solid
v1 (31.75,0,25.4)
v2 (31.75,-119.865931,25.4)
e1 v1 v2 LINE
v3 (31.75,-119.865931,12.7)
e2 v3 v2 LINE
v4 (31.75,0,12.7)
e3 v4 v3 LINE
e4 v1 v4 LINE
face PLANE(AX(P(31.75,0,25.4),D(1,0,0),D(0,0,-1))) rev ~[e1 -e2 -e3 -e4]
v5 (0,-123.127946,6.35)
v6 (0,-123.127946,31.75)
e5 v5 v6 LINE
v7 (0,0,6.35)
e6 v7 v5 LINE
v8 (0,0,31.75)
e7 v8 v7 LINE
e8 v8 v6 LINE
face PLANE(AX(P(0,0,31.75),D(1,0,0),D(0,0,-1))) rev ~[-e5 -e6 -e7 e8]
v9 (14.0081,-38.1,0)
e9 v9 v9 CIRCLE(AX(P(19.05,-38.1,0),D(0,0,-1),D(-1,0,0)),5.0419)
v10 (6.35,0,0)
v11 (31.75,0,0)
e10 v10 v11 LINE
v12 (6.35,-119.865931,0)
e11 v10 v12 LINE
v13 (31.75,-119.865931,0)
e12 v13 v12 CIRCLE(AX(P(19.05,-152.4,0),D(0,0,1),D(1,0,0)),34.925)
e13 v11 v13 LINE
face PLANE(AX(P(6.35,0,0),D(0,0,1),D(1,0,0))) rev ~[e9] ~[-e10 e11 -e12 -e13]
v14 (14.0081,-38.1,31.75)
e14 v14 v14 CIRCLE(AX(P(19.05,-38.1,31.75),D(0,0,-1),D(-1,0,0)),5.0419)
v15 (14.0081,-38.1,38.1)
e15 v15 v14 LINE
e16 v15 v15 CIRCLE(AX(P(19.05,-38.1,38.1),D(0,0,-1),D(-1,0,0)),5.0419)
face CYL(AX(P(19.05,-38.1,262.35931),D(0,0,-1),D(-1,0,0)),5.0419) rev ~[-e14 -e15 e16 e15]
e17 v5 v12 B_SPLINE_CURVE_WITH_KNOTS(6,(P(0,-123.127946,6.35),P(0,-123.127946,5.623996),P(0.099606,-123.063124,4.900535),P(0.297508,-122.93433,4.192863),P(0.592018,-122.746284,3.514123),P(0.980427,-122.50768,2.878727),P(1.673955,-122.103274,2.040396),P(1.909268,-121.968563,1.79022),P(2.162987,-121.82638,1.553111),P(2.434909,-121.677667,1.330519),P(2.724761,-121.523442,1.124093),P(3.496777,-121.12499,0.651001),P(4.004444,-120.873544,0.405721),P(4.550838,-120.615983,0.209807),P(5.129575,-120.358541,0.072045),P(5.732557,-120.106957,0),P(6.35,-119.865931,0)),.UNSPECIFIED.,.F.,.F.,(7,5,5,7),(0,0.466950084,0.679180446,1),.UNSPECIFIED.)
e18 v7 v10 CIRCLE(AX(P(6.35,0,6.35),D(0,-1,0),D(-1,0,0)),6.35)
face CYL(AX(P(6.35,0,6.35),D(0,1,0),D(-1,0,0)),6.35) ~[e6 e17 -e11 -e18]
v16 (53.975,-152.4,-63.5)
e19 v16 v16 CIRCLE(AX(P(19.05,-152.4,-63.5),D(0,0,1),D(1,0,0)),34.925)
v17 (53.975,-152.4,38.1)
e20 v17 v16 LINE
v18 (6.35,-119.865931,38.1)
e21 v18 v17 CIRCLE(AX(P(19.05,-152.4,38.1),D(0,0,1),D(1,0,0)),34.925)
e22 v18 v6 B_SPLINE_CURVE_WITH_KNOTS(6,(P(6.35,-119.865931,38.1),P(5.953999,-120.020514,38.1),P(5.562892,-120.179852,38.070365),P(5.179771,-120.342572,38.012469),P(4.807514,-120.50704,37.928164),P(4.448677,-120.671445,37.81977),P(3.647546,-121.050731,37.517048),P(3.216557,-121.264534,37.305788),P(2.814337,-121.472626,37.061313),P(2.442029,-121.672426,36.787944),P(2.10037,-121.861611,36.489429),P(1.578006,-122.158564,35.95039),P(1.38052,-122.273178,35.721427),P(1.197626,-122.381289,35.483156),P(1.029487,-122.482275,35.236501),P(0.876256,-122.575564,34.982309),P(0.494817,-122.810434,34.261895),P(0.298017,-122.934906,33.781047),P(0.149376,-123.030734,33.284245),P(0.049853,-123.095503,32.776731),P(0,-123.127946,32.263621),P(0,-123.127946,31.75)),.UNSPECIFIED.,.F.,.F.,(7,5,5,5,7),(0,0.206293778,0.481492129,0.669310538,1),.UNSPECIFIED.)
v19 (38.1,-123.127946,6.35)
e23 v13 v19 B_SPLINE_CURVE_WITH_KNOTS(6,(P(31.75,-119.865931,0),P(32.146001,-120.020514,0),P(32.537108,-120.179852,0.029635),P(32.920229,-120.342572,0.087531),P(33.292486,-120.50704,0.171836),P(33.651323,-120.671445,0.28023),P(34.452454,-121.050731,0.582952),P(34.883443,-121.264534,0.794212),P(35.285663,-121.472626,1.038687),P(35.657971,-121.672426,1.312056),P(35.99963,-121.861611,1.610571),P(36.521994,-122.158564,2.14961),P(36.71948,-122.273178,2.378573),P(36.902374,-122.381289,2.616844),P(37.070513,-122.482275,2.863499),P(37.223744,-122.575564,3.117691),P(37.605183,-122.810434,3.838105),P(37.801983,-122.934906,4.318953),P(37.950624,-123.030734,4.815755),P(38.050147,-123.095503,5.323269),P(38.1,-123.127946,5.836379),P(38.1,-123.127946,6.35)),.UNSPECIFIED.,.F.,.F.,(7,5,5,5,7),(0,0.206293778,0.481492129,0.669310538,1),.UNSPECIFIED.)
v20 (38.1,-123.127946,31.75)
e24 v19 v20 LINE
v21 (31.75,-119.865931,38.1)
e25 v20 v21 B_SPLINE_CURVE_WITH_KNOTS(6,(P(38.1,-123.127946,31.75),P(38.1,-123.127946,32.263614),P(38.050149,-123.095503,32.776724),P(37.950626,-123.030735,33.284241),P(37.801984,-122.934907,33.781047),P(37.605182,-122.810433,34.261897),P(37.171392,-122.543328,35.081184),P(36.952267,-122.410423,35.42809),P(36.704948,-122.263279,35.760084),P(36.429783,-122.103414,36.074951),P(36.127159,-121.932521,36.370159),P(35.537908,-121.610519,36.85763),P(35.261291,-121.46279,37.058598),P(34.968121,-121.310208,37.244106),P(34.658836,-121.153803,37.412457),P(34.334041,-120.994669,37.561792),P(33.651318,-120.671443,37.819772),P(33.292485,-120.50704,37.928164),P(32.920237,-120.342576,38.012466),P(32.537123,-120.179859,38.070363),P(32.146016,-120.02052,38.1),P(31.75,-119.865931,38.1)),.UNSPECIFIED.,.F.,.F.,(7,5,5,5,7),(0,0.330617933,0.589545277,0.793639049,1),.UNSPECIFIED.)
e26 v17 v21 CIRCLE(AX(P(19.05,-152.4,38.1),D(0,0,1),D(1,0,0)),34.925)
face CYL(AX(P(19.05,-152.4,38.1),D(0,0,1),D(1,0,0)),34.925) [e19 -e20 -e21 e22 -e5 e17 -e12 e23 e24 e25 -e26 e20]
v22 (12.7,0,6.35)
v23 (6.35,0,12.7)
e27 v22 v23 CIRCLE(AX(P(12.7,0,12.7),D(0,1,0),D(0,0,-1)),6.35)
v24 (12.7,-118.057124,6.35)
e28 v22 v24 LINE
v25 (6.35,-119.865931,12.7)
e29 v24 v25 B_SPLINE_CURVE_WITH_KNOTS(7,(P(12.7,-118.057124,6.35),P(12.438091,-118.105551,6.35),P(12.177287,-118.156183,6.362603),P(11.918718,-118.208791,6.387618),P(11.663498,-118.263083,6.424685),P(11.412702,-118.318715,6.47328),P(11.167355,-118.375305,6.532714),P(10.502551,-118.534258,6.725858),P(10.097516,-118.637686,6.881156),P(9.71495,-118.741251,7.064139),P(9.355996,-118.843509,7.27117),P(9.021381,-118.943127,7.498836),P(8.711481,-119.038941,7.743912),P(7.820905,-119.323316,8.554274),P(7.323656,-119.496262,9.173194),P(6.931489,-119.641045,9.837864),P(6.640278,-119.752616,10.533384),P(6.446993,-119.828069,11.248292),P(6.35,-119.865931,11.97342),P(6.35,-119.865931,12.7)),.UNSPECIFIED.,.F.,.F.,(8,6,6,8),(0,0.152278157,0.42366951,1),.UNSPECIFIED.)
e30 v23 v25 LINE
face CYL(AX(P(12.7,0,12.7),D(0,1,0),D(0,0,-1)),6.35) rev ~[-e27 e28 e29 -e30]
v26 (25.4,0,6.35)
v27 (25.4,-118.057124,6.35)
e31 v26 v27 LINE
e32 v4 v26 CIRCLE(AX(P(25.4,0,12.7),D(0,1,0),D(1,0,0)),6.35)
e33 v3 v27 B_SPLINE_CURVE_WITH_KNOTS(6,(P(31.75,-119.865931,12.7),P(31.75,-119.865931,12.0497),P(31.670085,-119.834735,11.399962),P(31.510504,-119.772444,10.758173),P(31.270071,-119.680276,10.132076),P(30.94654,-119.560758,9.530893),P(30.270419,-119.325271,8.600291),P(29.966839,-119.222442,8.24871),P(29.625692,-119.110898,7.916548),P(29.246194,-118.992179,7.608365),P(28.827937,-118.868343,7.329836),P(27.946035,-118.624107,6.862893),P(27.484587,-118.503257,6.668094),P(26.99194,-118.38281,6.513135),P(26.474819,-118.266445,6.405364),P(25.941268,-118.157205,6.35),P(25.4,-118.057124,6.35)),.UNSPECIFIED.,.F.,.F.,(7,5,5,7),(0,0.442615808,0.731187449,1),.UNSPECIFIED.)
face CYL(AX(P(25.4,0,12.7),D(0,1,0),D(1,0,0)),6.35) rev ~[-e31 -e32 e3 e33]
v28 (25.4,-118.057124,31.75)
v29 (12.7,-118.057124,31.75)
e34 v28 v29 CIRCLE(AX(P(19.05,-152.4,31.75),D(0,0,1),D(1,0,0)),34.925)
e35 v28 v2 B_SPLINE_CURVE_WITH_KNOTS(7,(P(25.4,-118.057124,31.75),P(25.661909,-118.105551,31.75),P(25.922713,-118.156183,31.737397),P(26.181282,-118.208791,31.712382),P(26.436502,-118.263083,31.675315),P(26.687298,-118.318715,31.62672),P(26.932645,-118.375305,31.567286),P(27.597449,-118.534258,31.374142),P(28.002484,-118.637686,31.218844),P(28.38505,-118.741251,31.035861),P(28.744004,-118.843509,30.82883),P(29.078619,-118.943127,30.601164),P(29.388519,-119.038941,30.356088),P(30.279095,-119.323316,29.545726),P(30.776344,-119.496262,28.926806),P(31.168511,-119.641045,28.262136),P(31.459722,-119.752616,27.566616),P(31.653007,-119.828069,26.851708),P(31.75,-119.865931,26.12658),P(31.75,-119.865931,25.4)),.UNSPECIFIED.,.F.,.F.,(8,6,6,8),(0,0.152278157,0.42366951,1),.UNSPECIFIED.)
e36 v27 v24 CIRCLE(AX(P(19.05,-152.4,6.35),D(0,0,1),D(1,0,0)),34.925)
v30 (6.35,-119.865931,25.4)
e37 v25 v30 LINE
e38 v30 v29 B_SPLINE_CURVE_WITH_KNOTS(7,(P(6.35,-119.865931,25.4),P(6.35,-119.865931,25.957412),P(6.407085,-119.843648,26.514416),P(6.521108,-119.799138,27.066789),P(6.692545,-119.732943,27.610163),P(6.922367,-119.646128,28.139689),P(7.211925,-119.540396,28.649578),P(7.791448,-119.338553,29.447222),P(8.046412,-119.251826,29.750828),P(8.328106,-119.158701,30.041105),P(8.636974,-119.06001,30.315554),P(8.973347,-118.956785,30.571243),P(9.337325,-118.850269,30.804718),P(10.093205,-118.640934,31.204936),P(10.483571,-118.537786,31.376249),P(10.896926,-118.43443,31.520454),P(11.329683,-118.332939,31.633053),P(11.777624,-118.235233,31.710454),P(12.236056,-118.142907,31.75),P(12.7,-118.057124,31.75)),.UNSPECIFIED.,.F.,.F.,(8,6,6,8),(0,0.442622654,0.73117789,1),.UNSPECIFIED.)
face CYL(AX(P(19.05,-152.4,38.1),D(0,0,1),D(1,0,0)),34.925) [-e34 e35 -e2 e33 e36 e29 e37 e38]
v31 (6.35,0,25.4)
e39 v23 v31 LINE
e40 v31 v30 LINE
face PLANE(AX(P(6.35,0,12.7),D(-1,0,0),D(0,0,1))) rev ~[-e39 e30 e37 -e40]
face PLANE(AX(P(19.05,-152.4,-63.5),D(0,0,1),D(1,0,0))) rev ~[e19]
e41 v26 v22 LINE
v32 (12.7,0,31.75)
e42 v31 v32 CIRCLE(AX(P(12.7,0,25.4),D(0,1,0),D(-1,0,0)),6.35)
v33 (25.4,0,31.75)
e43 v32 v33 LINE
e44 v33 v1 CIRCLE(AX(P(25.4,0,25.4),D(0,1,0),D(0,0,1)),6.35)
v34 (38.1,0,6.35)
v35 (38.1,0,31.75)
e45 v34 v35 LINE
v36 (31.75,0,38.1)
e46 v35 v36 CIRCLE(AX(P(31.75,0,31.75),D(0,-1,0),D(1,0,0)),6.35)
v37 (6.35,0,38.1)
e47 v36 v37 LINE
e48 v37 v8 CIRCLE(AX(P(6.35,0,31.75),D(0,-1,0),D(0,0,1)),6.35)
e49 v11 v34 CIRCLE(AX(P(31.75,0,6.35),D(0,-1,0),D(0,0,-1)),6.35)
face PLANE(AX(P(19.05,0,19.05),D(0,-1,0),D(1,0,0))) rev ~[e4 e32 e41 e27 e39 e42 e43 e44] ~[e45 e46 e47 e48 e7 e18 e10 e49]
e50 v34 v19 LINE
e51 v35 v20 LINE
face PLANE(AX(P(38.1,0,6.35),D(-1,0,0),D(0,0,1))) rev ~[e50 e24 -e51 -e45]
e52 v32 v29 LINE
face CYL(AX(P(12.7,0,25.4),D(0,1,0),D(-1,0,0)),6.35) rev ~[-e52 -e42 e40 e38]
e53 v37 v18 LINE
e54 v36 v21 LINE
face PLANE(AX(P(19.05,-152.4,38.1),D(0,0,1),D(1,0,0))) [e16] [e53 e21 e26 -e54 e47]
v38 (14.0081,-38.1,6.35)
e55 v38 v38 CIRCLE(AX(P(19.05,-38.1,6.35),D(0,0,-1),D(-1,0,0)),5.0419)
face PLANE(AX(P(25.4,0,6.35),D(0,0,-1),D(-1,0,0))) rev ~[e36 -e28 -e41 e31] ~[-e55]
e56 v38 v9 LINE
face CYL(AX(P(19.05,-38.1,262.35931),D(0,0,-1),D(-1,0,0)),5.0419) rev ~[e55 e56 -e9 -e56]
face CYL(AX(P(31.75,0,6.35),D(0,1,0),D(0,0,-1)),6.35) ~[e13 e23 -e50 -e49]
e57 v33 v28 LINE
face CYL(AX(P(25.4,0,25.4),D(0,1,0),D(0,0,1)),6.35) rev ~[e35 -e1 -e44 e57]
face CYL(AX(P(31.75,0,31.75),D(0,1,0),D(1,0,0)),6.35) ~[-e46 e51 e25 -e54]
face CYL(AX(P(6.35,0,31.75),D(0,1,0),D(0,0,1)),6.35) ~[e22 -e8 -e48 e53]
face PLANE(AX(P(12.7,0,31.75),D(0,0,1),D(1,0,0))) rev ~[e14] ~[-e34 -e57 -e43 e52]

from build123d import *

# Parameters (mm, degrees)
F1_DEPTH = 152.4
F2_R     = 34.925
F3_DEPTH = 101.6
F5_D     = 10.0838


with BuildPart() as f1:
    # F0 (on Front) → F1 (new body)
    with BuildSketch(Plane.XZ):
        with BuildLine():
            ThreePointArc((0, 6.35), (1.8598719395, 1.8598719395), (6.35, 0))
            Line((6.35, 0), (31.75, 0))
            ThreePointArc((31.75, 0), (36.2401280605, 1.8598719395), (38.1, 6.35))
            Line((38.1, 6.35), (38.1, 31.75))
            ThreePointArc((38.1, 31.75), (36.2401280605, 36.2401280605), (31.75, 38.1))
            Line((31.75, 38.1), (6.35, 38.1))
            ThreePointArc((6.35, 38.1), (1.8598719395, 36.2401280605), (0, 31.75))
            Line((0, 31.75), (0, 6.35))
        make_face()
        with BuildLine():
            Line((25.4, 6.35), (12.7, 6.35))
            ThreePointArc((12.7, 6.35), (8.2098719395, 8.2098719395), (6.35, 12.7))
            Line((6.35, 12.7), (6.35, 25.4))
            ThreePointArc((6.35, 25.4), (8.2098719395, 29.8901280605), (12.7, 31.75))
            Line((12.7, 31.75), (25.4, 31.75))
            ThreePointArc((25.4, 31.75), (29.8901280605, 29.8901280605), (31.75, 25.4))
            Line((31.75, 25.4), (31.75, 12.7))
            ThreePointArc((31.75, 12.7), (29.8901280605, 8.2098719395), (25.4, 6.35))
        make_face(mode=Mode.SUBTRACT)
    extrude(amount=F1_DEPTH)

    # F2 (on face) → F3 (join)
    with BuildSketch(Plane.XY.offset(38.1)):
        with Locations((19.05, -152.4)):
            Circle(F2_R)
    extrude(amount=-F3_DEPTH)

    # F5 (through all)
    with Locations(Plane.XY.offset(38.1)):
        with Locations((19.05, -38.1)):
            Hole(F5_D / 2)


solid = f1.part
